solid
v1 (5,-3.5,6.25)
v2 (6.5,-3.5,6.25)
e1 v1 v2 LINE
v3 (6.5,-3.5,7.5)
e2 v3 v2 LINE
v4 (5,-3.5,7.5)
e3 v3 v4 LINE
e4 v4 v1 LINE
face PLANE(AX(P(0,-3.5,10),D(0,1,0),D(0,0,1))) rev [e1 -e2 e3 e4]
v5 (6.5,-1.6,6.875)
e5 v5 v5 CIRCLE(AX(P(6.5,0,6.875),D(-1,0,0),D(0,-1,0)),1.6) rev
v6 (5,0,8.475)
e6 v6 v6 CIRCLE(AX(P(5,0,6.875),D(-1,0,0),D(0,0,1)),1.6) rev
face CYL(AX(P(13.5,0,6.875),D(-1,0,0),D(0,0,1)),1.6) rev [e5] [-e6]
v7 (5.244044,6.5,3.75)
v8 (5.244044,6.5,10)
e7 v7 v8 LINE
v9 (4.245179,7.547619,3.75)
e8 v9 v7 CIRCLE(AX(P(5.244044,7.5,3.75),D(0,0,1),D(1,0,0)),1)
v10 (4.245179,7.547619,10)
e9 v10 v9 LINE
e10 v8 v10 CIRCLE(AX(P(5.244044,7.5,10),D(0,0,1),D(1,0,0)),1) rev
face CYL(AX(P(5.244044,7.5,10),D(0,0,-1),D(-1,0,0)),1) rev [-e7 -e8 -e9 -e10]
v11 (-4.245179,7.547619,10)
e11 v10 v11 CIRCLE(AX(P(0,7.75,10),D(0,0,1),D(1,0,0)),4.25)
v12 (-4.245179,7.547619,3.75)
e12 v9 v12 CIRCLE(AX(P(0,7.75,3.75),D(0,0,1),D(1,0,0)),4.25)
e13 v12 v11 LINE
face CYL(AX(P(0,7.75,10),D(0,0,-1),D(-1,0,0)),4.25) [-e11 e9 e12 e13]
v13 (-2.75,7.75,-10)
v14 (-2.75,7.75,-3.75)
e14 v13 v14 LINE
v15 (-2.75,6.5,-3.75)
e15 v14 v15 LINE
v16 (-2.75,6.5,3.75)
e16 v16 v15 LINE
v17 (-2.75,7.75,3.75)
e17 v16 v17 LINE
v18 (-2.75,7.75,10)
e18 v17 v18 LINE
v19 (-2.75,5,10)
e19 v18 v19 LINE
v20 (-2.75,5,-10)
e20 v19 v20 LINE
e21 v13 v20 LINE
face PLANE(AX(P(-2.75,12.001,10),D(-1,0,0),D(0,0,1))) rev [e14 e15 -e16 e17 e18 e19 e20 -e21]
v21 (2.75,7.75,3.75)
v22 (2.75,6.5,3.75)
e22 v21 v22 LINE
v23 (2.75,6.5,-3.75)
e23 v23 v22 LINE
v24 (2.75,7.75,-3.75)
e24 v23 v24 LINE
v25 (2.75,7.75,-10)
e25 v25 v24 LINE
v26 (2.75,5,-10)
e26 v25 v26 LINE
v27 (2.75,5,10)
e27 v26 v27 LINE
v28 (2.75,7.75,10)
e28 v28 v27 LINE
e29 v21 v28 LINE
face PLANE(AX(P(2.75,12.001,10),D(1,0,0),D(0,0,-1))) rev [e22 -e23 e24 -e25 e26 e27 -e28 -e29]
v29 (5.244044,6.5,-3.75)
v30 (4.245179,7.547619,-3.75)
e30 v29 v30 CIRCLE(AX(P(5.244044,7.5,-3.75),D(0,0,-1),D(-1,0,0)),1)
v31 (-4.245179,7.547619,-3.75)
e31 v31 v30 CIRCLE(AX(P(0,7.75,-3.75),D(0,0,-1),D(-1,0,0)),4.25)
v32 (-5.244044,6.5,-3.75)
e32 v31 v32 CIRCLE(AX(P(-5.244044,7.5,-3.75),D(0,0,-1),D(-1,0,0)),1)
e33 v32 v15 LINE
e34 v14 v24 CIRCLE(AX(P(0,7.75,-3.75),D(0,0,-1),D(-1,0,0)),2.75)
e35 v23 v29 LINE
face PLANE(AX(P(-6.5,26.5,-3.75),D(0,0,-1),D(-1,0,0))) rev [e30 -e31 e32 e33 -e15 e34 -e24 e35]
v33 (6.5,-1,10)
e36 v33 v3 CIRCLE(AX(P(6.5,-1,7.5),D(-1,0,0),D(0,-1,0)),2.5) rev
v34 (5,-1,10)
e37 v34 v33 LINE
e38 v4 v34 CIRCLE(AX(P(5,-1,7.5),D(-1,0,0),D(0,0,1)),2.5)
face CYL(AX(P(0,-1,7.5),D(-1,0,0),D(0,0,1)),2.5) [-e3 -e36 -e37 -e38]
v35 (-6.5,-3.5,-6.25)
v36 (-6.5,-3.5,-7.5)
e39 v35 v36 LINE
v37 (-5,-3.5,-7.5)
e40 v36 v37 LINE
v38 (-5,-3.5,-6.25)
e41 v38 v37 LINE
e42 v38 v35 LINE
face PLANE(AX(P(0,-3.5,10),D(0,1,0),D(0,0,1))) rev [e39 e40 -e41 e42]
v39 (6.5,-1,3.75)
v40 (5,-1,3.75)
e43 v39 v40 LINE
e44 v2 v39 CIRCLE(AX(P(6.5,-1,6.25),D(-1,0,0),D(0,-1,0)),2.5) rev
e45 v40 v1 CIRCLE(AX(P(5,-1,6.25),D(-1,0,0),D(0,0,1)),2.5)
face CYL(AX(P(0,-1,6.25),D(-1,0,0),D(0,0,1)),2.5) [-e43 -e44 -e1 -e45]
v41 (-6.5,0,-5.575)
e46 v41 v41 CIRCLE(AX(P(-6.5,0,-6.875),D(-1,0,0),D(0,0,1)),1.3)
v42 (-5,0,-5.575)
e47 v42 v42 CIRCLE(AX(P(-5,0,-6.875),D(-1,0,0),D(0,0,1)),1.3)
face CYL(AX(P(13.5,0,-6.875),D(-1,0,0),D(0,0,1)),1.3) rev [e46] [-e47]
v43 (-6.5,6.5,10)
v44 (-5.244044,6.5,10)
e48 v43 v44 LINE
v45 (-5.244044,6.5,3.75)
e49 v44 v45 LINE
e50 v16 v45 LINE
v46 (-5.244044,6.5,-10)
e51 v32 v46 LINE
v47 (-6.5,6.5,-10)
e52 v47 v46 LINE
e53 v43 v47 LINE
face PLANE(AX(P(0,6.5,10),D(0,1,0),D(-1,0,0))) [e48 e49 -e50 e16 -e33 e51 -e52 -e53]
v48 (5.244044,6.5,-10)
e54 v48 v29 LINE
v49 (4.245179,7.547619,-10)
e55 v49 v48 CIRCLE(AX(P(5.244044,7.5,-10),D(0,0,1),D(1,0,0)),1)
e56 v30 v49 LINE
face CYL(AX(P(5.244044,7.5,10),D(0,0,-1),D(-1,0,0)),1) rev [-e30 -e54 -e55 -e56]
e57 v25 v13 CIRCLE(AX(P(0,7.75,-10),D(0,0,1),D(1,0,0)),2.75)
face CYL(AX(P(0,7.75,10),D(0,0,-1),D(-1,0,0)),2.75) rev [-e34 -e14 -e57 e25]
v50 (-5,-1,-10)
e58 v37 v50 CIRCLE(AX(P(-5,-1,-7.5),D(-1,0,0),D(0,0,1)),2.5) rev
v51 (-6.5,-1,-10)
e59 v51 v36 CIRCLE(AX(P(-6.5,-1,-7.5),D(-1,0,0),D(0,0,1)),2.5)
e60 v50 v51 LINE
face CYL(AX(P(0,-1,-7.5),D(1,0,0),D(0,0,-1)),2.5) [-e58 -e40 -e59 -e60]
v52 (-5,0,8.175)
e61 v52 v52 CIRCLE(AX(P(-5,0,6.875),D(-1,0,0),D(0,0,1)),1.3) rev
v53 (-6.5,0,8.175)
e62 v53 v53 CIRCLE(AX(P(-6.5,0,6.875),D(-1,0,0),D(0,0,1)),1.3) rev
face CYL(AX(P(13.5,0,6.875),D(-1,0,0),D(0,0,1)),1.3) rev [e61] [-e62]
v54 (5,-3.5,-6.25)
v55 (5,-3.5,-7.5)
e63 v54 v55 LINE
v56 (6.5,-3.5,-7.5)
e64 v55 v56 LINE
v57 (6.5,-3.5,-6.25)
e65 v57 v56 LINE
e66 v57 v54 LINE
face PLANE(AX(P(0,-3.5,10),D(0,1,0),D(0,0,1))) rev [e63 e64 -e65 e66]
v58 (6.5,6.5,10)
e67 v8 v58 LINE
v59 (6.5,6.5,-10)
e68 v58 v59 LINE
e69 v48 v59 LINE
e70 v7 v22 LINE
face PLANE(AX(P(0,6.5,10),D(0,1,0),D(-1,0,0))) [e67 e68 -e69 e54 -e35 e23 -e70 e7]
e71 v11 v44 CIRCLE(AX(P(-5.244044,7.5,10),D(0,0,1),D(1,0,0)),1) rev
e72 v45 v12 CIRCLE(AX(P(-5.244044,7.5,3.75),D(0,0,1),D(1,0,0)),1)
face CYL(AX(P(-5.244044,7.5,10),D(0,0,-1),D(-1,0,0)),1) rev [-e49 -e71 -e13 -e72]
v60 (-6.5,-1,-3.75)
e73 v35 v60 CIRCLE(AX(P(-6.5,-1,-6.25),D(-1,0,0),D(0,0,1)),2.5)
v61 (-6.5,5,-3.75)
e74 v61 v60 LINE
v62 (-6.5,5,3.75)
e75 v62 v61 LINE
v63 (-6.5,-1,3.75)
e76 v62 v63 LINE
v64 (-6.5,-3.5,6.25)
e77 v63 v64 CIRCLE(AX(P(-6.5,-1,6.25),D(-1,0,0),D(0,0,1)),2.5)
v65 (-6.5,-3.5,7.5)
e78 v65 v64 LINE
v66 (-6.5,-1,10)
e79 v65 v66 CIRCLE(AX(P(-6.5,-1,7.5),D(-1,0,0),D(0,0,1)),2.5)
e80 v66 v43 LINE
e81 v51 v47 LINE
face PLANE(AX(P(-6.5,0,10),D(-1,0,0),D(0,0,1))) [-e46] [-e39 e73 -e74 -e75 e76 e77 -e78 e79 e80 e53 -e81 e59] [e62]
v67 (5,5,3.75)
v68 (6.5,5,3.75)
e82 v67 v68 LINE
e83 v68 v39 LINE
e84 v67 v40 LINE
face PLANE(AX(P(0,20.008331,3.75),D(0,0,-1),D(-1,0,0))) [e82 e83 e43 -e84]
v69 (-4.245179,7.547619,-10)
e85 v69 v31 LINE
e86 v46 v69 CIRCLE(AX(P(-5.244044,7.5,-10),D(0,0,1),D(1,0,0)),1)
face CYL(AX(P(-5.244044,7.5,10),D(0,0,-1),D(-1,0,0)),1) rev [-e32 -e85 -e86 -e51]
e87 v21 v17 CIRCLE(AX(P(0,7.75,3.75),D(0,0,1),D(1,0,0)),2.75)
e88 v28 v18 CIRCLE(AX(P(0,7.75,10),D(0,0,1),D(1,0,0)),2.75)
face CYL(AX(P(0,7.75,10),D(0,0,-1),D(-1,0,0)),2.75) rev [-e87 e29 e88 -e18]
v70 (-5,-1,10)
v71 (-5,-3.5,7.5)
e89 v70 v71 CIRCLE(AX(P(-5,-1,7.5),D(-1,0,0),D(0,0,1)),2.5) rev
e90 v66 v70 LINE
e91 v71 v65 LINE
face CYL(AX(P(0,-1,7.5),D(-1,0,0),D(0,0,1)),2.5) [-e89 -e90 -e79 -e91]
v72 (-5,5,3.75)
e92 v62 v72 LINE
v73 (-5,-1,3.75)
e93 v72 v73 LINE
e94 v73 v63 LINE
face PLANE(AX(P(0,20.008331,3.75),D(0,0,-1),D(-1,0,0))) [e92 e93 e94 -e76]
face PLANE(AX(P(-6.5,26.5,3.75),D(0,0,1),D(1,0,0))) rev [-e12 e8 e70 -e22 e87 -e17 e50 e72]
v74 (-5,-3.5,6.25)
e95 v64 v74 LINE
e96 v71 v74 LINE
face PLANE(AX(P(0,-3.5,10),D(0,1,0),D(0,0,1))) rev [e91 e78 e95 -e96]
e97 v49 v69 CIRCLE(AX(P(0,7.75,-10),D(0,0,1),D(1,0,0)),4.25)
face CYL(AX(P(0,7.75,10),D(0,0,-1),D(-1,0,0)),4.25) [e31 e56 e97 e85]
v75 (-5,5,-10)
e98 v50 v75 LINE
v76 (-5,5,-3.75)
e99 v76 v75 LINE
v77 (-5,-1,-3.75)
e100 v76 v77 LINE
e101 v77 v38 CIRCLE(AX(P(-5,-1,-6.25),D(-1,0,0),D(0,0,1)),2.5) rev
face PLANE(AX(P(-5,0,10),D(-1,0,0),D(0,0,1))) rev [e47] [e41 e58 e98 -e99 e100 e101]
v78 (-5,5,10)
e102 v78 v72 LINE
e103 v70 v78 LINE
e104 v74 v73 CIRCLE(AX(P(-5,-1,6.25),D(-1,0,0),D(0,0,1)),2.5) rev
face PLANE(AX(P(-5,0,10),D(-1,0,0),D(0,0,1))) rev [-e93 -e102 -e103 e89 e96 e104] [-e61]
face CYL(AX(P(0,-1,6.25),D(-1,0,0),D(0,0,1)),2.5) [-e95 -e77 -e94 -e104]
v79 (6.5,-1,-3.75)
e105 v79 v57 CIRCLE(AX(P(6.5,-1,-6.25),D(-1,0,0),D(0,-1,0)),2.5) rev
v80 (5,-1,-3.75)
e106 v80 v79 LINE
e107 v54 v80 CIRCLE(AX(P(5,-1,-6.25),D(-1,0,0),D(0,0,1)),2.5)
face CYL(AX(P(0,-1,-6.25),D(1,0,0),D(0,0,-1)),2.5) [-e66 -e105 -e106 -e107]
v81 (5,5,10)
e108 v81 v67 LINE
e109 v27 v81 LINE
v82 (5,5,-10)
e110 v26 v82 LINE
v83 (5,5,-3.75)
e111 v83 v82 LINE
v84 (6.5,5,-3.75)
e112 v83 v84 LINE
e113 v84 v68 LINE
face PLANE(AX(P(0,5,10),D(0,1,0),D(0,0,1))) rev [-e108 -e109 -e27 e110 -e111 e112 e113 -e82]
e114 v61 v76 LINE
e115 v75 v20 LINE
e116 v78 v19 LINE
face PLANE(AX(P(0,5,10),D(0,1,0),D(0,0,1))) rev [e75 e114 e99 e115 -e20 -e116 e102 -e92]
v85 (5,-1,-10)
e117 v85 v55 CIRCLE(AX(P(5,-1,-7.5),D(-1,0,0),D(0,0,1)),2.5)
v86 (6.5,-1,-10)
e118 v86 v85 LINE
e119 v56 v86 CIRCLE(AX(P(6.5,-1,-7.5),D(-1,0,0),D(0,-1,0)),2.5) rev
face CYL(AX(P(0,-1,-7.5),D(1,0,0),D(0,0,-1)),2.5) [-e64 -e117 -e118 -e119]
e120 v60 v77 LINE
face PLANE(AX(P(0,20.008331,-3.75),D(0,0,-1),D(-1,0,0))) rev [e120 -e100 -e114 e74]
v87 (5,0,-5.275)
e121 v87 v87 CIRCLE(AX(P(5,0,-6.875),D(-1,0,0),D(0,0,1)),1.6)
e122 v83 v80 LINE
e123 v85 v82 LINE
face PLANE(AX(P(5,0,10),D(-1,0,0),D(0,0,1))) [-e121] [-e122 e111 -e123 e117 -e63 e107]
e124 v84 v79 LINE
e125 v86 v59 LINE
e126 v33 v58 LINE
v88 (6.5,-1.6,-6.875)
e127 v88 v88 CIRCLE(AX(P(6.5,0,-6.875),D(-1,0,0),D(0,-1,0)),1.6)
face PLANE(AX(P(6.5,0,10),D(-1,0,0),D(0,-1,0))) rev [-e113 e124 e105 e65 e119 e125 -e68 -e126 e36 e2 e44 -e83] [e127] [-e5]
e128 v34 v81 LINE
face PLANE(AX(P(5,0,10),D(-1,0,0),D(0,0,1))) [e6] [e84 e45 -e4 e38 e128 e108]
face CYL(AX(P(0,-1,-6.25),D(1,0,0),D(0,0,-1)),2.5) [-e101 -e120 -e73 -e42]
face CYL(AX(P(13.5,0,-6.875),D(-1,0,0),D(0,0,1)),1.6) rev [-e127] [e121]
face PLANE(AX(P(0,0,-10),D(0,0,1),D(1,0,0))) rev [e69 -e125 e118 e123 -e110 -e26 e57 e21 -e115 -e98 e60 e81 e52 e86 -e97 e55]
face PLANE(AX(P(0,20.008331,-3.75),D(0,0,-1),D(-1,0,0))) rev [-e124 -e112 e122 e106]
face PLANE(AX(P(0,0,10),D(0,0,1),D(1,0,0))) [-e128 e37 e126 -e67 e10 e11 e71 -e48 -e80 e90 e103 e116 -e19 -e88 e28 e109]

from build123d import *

# Parameters (mm, degrees)
EXTRUDE_1_DEPTH     = 10
SKETCH_2_W          = 10
SKETCH_2_H          = 7.5
SKETCH_2_W_2        = 1.5
CUT_EXTRUDE_1_DEPTH = 10
CUT_EXTRUDE_START   = -1.5
SKETCH_3_W          = 13
SKETCH_3_H          = 7.5
CUT_EXTRUDE_2_DEPTH = 20
CUT_EXTRUDE_3_REACH = 17.564
SKETCH_4_W          = 5.5
SKETCH_4_H          = 20
FILLET_1_R          = 2.5
FILLET_2_R          = 1
SKETCH_5_R          = 1.6
CUT_EXTRUDE_4_DEPTH = 20
MOVE_START          = -6.5
MOVE_FACE_1_DEPTH   = 13
MOVE_FACE_2_BY      = 0.3
MOVE_FACE_2_2_BY    = 0.3


# Read off the part's stored shape, not the designer's step: 面の移動1
with BuildPart() as part:
    # ｽｹｯﾁ1 → ﾎﾞｽ - 押し出し1 (new, symmetric)
    with BuildSketch(Plane.XY):
        with BuildLine():
            Line((-5, 5), (5, 5))
            Line((5, 5), (5, -5))
            Line((5, -5), (6.5, -5))
            Line((6.5, -5), (6.5, 6.5))
            Line((6.5, 6.5), (4.062019202, 6.5))
            ThreePointArc((4.062019202, 6.5), (0, 12), (-4.062019202, 6.5))
            Line((-4.062019202, 6.5), (-6.5, 6.5))
            Line((-6.5, 6.5), (-6.5, -5))
            Line((-6.5, -5), (-5, -5))
            Line((-5, -5), (-5, 5))
        make_face()
        with BuildLine():
            Line((2.449489743, 6.5), (-2.449489743, 6.5))
            ThreePointArc((-2.449489743, 6.5), (0, 10.5), (2.449489743, 6.5))
        make_face(mode=Mode.SUBTRACT)
    extrude(amount=EXTRUDE_1_DEPTH, both=True)

    # ｽｹｯﾁ2 → ｶｯﾄ - 押し出し1 (cut)
    with BuildSketch(Plane.XZ.offset(5)):
        Rectangle(SKETCH_2_W, SKETCH_2_H)
        with Locations((-5.75, 0)):
            Rectangle(SKETCH_2_W_2, SKETCH_2_H)
        with Locations((5.75, 0)):
            Rectangle(SKETCH_2_W_2, SKETCH_2_H)
    extrude(amount=-CUT_EXTRUDE_1_DEPTH, mode=Mode.SUBTRACT)

    # ｽｹｯﾁ3 → ｶｯﾄ - 押し出し2 (cut)
    with BuildSketch(Plane.XZ.offset(-5).offset(CUT_EXTRUDE_START)):
        Rectangle(SKETCH_3_W, SKETCH_3_H)
    extrude(amount=-CUT_EXTRUDE_2_DEPTH, mode=Mode.SUBTRACT)

    # ｽｹｯﾁ4 → ｶｯﾄ - 押し出し3 (cut, up to next)
    with BuildSketch(Plane.XZ.offset(-5), mode=Mode.PRIVATE) as cut_extrude_3_sk1:
        Rectangle(SKETCH_4_W, SKETCH_4_H)
    cut_extrude_3_tool1 = extrude(cut_extrude_3_sk1.sketch, amount=-CUT_EXTRUDE_3_REACH, mode=Mode.PRIVATE) & part.part
    add(cut_extrude_3_tool1.solids().sort_by_distance((0, 5, 0))[0], mode=Mode.SUBTRACT)

    # ﾌｨﾚｯﾄ1
    fillet_1_edges = [part.edges().sort_by_distance(p)[0] for p in [
        (5.75, -5, -10),
        (-5.75, -5, -10),
        (-5.75, -5, 10),
        (-5.75, -5, -3.75),
        (-5.75, -5, 3.75),
        (5.75, -5, -3.75),
        (5.75, -5, 3.75),
        (5.75, -5, 10),
    ]]
    fillet(fillet_1_edges, radius=FILLET_1_R)

    # ﾌｨﾚｯﾄ2
    fillet_2_edges = [part.edges().sort_by_distance(p)[0] for p in [
        (-4.062019202, 6.5, 6.875),
        (4.062019202, 6.5, 6.875),
        (-4.062019202, 6.5, -6.875),
        (4.062019202, 6.5, -6.875),
    ]]
    fillet(fillet_2_edges, radius=FILLET_2_R)

    # ｽｹｯﾁ5 → ｶｯﾄ - 押し出し4 (cut)
    with BuildSketch(Plane.ZY.offset(6.5)):
        with Locations((-6.875, 0)):
            Circle(SKETCH_5_R)
    cut_extrude_4 = extrude(amount=-CUT_EXTRUDE_4_DEPTH, mode=Mode.SUBTRACT)

    # ﾐﾗｰ1: ｶｯﾄ - 押し出し4 across plane
    add(cut_extrude_4.mirror(Plane.XY), mode=Mode.SUBTRACT)

    # Move Face 1 outline → Move Face 1 (cut)
    with BuildSketch(Plane.YZ.offset(MOVE_START)):
        with BuildLine():
            ThreePointArc((-1, 3.75), (-2.767766953, 4.482233047), (-3.5, 6.25))
            Line((-3.5, 6.25), (-3.5, 7.5))
            ThreePointArc((-3.5, 7.5), (-2.767766953, 9.267766953), (-1, 10))
            Line((-1, 10), (-2.5, 10))
            ThreePointArc((-2.5, 10), (-4.267766953, 9.267766953), (-5, 7.5))
            Line((-5, 7.5), (-5, 6.25))
            ThreePointArc((-5, 6.25), (-4.267766953, 4.482233047), (-2.5, 3.75))
            Line((-2.5, 3.75), (-1, 3.75))
        make_face()
        with BuildLine():
            ThreePointArc((-1, -10), (-2.767766953, -9.267766953), (-3.5, -7.5))
            Line((-3.5, -7.5), (-3.5, -6.25))
            ThreePointArc((-3.5, -6.25), (-2.767766953, -4.482233047), (-1, -3.75))
            Line((-1, -3.75), (-2.5, -3.75))
            ThreePointArc((-2.5, -3.75), (-4.267766953, -4.482233047), (-5, -6.25))
            Line((-5, -6.25), (-5, -7.5))
            ThreePointArc((-5, -7.5), (-4.267766953, -9.267766953), (-2.5, -10))
            Line((-2.5, -10), (-1, -10))
        make_face()
    extrude(amount=MOVE_FACE_1_DEPTH, mode=Mode.SUBTRACT)

    # Move Face 2: a curved face moved outward by 0.3
    add(Solid.thicken(part.faces().sort_by_distance((-5.75, 0, -8.475))[0], MOVE_FACE_2_BY))

    # Move Face 2 2: a curved face moved outward by 0.3
    add(Solid.thicken(part.faces().sort_by_distance((-5.75, 0, 8.475))[0], MOVE_FACE_2_2_BY))


solid = part.part
